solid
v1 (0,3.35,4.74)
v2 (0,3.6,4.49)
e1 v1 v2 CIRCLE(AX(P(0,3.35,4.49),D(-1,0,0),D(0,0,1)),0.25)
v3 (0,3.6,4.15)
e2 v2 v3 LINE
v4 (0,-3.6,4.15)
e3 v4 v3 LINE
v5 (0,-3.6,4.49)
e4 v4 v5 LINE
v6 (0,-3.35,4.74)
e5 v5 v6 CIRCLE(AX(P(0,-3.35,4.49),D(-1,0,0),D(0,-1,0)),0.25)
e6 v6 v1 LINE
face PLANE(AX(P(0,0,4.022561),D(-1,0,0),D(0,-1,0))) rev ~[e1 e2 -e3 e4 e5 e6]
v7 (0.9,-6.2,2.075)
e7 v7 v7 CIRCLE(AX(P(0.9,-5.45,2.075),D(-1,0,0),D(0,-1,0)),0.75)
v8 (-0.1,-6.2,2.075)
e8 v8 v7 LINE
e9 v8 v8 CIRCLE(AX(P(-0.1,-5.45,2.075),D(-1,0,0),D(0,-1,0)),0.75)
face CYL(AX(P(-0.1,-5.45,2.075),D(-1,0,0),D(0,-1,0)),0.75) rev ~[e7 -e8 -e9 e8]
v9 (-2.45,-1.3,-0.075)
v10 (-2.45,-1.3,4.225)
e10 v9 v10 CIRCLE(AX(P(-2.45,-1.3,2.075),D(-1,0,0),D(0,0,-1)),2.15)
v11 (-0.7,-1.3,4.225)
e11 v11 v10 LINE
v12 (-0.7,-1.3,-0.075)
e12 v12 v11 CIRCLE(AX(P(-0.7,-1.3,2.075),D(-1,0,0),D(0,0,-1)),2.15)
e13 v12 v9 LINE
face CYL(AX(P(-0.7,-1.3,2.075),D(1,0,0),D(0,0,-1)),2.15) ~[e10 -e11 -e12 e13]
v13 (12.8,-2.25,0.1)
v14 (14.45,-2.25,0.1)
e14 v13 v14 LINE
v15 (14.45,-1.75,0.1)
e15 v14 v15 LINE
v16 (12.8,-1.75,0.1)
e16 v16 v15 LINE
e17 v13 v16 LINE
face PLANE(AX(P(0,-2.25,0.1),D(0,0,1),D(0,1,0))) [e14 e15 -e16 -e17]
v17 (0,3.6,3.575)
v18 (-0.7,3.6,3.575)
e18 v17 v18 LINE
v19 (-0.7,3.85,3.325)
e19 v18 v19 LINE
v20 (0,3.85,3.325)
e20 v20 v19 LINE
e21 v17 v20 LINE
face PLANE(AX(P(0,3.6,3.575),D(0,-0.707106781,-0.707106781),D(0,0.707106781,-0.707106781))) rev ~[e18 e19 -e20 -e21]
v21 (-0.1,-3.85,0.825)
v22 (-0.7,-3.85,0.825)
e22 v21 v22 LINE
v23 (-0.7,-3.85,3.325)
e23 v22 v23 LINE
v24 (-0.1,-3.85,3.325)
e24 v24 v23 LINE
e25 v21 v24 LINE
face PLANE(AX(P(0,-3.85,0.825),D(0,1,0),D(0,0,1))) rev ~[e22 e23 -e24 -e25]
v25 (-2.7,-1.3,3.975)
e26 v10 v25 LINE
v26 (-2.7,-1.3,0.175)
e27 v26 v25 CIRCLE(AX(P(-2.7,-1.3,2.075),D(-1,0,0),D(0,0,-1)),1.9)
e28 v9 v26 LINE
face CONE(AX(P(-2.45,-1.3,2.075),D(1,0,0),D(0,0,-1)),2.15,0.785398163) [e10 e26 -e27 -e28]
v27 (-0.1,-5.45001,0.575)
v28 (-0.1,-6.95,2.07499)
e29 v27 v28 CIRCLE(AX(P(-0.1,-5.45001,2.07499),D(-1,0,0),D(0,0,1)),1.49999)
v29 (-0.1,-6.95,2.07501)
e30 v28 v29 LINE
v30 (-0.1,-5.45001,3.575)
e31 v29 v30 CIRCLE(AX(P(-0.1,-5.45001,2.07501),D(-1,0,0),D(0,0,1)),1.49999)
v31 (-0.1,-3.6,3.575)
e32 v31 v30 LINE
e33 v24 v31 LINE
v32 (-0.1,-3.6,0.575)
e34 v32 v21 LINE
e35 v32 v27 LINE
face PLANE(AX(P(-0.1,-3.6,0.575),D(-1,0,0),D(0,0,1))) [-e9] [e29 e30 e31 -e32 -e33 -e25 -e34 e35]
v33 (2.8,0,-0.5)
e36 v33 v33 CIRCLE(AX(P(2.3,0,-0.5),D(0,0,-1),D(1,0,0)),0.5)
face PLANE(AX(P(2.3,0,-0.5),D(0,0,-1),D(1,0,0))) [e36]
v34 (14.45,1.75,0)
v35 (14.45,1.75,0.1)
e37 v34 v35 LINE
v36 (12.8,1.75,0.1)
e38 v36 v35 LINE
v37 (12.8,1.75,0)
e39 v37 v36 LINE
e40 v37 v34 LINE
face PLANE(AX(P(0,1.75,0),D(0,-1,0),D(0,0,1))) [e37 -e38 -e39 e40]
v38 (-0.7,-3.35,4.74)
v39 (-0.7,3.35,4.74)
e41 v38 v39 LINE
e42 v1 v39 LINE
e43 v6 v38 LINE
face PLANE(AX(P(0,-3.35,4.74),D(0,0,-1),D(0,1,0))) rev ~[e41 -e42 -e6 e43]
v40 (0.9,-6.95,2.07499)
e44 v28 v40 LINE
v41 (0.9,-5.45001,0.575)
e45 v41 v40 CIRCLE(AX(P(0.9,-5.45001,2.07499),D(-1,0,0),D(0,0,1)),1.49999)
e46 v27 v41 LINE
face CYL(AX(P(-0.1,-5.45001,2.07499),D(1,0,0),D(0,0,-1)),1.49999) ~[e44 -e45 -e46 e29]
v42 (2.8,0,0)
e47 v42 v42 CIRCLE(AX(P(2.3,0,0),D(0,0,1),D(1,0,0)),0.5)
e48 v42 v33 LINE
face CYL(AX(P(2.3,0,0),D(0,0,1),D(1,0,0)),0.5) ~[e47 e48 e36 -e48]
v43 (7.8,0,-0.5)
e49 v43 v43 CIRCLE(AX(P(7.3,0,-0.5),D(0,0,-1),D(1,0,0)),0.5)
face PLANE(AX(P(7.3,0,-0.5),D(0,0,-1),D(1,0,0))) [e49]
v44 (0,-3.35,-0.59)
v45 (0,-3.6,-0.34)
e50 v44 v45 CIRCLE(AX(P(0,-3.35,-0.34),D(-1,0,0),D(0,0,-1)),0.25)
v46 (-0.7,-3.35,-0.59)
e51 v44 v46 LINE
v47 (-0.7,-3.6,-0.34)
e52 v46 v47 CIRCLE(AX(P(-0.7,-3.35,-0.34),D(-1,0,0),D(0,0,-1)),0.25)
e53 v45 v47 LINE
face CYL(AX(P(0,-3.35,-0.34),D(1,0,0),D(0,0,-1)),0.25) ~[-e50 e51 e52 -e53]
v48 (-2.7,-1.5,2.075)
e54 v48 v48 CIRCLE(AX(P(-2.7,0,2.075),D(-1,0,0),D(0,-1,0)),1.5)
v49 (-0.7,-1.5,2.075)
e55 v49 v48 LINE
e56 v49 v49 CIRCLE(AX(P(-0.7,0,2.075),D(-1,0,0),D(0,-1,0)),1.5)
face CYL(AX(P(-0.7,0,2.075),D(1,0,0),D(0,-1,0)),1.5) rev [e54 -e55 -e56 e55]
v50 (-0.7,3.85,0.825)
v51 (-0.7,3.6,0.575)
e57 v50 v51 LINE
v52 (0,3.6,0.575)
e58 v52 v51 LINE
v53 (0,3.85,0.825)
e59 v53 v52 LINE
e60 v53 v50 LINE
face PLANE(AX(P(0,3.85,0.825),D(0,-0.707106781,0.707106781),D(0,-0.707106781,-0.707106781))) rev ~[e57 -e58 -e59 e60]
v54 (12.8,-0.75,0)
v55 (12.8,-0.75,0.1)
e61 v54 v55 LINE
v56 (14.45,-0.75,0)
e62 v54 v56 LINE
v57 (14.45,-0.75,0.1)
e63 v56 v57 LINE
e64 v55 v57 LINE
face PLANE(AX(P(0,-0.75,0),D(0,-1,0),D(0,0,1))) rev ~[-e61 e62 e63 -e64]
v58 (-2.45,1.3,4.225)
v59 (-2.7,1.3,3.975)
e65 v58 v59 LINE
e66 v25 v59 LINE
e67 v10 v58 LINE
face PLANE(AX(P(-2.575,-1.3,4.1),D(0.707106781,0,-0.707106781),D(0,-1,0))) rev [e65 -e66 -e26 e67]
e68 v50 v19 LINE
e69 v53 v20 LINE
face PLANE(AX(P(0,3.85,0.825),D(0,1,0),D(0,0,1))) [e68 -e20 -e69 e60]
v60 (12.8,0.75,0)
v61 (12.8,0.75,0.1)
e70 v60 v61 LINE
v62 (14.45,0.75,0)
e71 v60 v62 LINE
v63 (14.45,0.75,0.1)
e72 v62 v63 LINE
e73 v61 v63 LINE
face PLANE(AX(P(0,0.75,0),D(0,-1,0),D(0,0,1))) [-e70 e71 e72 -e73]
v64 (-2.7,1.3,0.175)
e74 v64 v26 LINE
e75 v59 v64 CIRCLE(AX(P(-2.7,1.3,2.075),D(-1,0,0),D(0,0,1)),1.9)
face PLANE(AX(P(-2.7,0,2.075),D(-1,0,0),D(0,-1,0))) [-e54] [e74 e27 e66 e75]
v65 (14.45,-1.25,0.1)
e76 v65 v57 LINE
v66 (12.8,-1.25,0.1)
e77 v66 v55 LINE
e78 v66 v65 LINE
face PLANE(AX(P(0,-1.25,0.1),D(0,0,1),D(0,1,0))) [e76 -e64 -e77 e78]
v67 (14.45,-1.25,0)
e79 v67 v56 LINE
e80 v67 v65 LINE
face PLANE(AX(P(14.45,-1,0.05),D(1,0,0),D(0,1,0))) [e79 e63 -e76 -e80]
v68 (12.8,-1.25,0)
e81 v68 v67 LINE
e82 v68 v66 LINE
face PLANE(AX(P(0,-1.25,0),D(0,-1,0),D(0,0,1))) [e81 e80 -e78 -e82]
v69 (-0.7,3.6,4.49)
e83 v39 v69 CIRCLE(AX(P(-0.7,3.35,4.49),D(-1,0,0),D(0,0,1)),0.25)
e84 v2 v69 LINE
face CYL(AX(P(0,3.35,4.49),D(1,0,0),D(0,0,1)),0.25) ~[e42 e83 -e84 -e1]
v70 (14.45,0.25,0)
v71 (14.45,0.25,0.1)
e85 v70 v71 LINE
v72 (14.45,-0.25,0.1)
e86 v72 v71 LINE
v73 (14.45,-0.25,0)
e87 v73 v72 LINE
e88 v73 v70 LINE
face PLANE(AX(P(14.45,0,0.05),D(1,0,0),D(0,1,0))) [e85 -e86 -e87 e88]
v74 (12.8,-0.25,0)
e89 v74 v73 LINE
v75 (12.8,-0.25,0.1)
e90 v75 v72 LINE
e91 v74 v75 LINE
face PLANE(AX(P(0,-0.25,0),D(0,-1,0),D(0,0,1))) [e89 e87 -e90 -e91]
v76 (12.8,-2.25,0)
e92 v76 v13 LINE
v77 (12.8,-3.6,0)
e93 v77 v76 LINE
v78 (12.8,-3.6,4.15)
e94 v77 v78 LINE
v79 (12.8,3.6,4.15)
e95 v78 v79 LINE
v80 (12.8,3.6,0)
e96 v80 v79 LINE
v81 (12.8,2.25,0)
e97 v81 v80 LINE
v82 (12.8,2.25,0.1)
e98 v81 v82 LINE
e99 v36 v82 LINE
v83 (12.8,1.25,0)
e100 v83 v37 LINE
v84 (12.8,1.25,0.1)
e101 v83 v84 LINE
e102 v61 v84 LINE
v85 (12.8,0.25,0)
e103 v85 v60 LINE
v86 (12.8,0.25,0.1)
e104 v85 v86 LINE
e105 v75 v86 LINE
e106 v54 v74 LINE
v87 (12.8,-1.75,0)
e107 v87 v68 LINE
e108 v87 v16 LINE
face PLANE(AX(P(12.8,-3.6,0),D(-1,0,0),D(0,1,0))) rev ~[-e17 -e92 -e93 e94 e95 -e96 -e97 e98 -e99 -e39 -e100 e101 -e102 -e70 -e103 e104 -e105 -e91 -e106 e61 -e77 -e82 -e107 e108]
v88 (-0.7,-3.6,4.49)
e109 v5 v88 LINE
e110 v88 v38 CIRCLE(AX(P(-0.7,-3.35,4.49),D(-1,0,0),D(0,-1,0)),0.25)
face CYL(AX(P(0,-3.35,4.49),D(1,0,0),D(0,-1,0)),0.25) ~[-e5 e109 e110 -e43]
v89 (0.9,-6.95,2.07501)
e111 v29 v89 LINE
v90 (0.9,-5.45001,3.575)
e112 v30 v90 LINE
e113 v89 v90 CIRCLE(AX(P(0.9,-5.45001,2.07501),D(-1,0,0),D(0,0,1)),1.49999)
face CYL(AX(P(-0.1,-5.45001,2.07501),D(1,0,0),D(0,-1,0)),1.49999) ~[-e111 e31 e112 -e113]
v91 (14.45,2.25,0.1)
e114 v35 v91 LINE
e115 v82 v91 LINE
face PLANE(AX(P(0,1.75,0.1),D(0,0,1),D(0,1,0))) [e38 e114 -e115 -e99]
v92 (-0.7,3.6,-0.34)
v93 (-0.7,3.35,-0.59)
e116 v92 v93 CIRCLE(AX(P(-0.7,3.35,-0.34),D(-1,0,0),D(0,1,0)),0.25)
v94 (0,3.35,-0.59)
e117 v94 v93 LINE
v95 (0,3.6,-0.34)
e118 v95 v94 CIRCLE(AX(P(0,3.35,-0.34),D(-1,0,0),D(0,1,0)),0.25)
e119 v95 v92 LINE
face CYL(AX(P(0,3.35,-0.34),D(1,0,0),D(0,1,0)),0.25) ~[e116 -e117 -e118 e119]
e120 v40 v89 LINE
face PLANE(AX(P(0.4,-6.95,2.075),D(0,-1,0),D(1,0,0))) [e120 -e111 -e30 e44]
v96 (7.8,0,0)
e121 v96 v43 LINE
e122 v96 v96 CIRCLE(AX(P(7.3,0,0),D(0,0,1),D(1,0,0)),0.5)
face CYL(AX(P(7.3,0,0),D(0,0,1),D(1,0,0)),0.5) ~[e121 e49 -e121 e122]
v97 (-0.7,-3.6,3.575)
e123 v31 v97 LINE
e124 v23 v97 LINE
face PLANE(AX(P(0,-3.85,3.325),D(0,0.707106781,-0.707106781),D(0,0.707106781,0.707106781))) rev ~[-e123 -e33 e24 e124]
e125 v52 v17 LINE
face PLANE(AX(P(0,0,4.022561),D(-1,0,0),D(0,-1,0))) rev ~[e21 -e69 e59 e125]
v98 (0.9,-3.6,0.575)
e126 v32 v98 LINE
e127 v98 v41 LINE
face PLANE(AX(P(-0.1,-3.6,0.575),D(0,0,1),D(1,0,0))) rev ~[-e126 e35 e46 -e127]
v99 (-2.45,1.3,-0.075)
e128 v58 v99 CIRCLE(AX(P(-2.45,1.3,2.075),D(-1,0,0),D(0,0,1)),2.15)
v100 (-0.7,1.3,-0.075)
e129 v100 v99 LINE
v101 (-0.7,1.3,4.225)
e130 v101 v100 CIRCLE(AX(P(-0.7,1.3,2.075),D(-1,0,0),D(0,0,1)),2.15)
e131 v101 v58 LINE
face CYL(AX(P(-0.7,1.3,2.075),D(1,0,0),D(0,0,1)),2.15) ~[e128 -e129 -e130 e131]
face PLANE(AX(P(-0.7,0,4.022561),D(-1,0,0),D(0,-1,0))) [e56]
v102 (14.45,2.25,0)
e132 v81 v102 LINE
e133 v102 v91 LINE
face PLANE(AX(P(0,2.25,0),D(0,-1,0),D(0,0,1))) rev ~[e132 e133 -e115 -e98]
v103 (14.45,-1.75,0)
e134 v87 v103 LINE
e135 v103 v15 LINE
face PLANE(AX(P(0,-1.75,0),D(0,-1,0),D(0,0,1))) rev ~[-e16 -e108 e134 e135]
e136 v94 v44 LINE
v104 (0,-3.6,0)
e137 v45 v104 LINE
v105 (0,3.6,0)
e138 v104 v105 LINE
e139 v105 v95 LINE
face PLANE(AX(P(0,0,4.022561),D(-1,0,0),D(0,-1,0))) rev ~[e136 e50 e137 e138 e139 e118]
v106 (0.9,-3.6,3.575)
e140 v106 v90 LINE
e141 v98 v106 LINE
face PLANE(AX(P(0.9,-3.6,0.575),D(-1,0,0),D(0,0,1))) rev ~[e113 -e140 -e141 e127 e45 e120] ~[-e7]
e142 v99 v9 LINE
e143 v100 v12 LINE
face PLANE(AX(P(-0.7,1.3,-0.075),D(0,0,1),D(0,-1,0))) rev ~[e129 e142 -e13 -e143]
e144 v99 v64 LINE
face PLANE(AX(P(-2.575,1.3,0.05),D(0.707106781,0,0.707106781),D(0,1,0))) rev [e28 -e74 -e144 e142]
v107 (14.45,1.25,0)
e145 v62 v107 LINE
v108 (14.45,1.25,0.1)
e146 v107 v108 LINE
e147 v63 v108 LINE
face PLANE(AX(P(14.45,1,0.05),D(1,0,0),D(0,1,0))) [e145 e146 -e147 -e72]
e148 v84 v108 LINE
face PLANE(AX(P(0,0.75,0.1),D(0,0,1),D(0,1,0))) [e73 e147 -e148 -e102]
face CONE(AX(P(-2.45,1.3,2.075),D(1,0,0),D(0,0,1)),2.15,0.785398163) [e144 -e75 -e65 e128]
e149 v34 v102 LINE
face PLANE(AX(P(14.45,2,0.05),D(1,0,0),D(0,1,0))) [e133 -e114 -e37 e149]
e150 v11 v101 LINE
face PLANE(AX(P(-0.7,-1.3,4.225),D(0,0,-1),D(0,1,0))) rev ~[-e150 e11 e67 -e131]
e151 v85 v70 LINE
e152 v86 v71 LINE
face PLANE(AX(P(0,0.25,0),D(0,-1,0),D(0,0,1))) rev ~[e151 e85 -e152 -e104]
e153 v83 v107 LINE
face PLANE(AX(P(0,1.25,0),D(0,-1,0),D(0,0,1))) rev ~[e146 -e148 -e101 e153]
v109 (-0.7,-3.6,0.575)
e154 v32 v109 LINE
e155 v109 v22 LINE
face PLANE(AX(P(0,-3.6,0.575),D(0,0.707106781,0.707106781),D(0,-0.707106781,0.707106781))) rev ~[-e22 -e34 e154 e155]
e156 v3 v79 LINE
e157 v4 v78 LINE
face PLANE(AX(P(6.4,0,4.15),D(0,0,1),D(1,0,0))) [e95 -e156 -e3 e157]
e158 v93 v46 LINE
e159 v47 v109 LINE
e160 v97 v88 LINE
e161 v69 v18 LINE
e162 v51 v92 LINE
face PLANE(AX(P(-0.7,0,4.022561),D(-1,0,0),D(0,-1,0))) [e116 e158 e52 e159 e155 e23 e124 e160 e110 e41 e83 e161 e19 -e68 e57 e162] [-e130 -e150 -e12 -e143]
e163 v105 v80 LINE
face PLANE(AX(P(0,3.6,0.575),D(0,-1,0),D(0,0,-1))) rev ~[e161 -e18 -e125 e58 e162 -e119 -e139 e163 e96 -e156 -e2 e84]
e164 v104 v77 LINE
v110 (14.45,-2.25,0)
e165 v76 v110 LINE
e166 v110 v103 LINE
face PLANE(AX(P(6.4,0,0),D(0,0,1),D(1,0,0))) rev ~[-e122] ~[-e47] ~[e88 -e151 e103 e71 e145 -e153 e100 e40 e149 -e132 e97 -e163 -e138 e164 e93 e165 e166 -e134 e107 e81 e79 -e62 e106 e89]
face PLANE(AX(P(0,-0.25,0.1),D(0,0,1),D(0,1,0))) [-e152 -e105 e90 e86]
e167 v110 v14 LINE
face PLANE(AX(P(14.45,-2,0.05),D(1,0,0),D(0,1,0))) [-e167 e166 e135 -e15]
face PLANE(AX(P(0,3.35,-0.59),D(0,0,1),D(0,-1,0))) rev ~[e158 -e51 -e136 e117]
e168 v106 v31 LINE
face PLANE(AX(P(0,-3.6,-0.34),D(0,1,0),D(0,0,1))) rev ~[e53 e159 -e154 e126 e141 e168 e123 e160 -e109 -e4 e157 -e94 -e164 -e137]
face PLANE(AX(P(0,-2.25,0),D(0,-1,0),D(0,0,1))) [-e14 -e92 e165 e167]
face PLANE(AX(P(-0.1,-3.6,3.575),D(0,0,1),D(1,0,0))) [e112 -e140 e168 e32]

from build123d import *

# Parameters (mm, degrees)
F0_W      = 12.8
F0_H      = 7.2
F1_DEPTH  = 4.15
F2_W      = 0.25
F2_H      = 2.5
F2_W_2    = 7.2
F3_DEPTH  = 0.7
F4_R      = 1.5
F5_DEPTH  = 2
F6_SIZE   = 0.25
F7_W      = 1
F7_H      = 3
F8_DEPTH  = 3.35
F9_R      = 1.49999
F10_R     = 0.75
F11_DEPTH = 25
F12_R     = 0.5
F13_DEPTH = 0.5
F14_W     = 0.5
F14_H     = 0.1
F15_DEPTH = 14.45


# Not quite as in the source:
# - a fillet or chamfer is up to 0.001 mm smaller than in the source, because OpenCascade refuses the exact size


with BuildPart() as f1:
    # F0 (on Top) → F1 (new body)
    with BuildSketch(Plane.XY):
        with Locations((6.4, 0)):
            Rectangle(F0_W, F0_H)
    extrude(amount=F1_DEPTH)

    # F2 (on face) → F3 (join)
    with BuildSketch(Plane(origin=(0, 0, 0), x_dir=(0, -1, 0), z_dir=(-1, 0, 0))):
        with BuildLine():
            Line((3.35, 4.74), (-3.35, 4.74))
            ThreePointArc((-3.35, 4.74), (-3.5267766953, 4.6667766953), (-3.6, 4.49))
            Line((-3.6, 4.49), (-3.6, 3.575))
            Line((-3.6, 3.575), (-3.6, 3.325))
            Line((-3.6, 3.325), (3.6, 3.325))
            Line((3.6, 3.325), (3.6, 3.575))
            Line((3.6, 3.575), (3.6, 4.49))
            ThreePointArc((3.6, 4.49), (3.5267766953, 4.6667766953), (3.35, 4.74))
        make_face()
        Polygon((-3.6, 3.325), (-3.6, 3.575), (-3.85, 3.325), align=None)
        Polygon((3.85, 3.325), (3.6, 3.575), (3.6, 3.325), align=None)
        with Locations((-3.725, 2.075)):
            Rectangle(F2_W, F2_H)
        with Locations((3.725, 2.075)):
            Rectangle(F2_W, F2_H)
        with BuildLine():
            Line((3.6, 0.825), (-3.6, 0.825))
            Line((-3.6, 0.825), (-3.6, 0.575))
            Line((-3.6, 0.575), (-3.6, -0.34))
            ThreePointArc((-3.6, -0.34), (-3.5267766953, -0.5167766953), (-3.35, -0.59))
            Line((-3.35, -0.59), (3.35, -0.59))
            ThreePointArc((3.35, -0.59), (3.5267766953, -0.5167766953), (3.6, -0.34))
            Line((3.6, -0.34), (3.6, 0.575))
            Line((3.6, 0.575), (3.6, 0.825))
        make_face()
        Polygon((-3.6, 0.575), (-3.6, 0.825), (-3.85, 0.825), align=None)
        Polygon((3.85, 0.825), (3.6, 0.825), (3.6, 0.575), align=None)
        with Locations((0, 2.075)):
            Rectangle(F2_W_2, F2_H)
    extrude(amount=F3_DEPTH)

    # F4 (on face) → F5 (join)
    with BuildSketch(Plane(origin=(-0.7, 0, 0), x_dir=(0, -1, 0), z_dir=(-1, 0, 0))):
        with BuildLine():
            ThreePointArc((1.3, -0.075), (3.45, 2.075), (1.3, 4.225))
            Line((1.3, 4.225), (-1.3, 4.225))
            ThreePointArc((-1.3, 4.225), (-3.45, 2.075), (-1.3, -0.075))
            Line((-1.3, -0.075), (1.3, -0.075))
        make_face()
        with Locations((0, 2.075)):
            Circle(F4_R, mode=Mode.SUBTRACT)
    extrude(amount=F5_DEPTH)

    # F6
    f6_edges = [f1.edges().sort_by_distance(p)[0] for p in [
        (-2.7, 0, 4.225),
    ]]
    chamfer(f6_edges, length=F6_SIZE)

    # F7 (on face) → F8 (join)
    with BuildSketch(Plane.XZ.offset(3.6)):
        with Locations((0.4, 2.075)):
            Rectangle(F7_W, F7_H)
    extrude(amount=F8_DEPTH)

    # F9 (radius 1.5 in the source; OpenCascade refuses exactly that, so slightly less here)
    f9_edges = [f1.edges().sort_by_distance(p)[0] for p in [
        (0.4, -6.95, 3.575),
        (0.4, -6.95, 0.575),
    ]]
    fillet(f9_edges, radius=F9_R)

    # F10 (on face) → F11 (cut)
    with BuildSketch(Plane(origin=(-0.1, 0, 0), x_dir=(0, -1, 0), z_dir=(-1, 0, 0))):
        with Locations((5.45, 2.075)):
            Circle(F10_R)
    extrude(amount=-F11_DEPTH, mode=Mode.SUBTRACT)

    # F12 (on face) → F13 (join)
    with BuildSketch(Plane(origin=(0, 0, 0), x_dir=(1, 0, 0), z_dir=(0, 0, -1))):
        with Locations((2.3, 0)):
            Circle(F12_R)
        with Locations((7.3, 0)):
            Circle(F12_R)
    extrude(amount=F13_DEPTH)

    # F14 (on face) → F15 (join)
    with BuildSketch(Plane.YZ):
        with Locations((0, 0.05)):
            Rectangle(F14_W, F14_H)
        with Locations((1, 0.05)):
            Rectangle(F14_W, F14_H)
        with Locations((2, 0.05)):
            Rectangle(F14_W, F14_H)
        with Locations((-1, 0.05)):
            Rectangle(F14_W, F14_H)
        with Locations((-2, 0.05)):
            Rectangle(F14_W, F14_H)
    extrude(amount=F15_DEPTH)


solid = f1.part
